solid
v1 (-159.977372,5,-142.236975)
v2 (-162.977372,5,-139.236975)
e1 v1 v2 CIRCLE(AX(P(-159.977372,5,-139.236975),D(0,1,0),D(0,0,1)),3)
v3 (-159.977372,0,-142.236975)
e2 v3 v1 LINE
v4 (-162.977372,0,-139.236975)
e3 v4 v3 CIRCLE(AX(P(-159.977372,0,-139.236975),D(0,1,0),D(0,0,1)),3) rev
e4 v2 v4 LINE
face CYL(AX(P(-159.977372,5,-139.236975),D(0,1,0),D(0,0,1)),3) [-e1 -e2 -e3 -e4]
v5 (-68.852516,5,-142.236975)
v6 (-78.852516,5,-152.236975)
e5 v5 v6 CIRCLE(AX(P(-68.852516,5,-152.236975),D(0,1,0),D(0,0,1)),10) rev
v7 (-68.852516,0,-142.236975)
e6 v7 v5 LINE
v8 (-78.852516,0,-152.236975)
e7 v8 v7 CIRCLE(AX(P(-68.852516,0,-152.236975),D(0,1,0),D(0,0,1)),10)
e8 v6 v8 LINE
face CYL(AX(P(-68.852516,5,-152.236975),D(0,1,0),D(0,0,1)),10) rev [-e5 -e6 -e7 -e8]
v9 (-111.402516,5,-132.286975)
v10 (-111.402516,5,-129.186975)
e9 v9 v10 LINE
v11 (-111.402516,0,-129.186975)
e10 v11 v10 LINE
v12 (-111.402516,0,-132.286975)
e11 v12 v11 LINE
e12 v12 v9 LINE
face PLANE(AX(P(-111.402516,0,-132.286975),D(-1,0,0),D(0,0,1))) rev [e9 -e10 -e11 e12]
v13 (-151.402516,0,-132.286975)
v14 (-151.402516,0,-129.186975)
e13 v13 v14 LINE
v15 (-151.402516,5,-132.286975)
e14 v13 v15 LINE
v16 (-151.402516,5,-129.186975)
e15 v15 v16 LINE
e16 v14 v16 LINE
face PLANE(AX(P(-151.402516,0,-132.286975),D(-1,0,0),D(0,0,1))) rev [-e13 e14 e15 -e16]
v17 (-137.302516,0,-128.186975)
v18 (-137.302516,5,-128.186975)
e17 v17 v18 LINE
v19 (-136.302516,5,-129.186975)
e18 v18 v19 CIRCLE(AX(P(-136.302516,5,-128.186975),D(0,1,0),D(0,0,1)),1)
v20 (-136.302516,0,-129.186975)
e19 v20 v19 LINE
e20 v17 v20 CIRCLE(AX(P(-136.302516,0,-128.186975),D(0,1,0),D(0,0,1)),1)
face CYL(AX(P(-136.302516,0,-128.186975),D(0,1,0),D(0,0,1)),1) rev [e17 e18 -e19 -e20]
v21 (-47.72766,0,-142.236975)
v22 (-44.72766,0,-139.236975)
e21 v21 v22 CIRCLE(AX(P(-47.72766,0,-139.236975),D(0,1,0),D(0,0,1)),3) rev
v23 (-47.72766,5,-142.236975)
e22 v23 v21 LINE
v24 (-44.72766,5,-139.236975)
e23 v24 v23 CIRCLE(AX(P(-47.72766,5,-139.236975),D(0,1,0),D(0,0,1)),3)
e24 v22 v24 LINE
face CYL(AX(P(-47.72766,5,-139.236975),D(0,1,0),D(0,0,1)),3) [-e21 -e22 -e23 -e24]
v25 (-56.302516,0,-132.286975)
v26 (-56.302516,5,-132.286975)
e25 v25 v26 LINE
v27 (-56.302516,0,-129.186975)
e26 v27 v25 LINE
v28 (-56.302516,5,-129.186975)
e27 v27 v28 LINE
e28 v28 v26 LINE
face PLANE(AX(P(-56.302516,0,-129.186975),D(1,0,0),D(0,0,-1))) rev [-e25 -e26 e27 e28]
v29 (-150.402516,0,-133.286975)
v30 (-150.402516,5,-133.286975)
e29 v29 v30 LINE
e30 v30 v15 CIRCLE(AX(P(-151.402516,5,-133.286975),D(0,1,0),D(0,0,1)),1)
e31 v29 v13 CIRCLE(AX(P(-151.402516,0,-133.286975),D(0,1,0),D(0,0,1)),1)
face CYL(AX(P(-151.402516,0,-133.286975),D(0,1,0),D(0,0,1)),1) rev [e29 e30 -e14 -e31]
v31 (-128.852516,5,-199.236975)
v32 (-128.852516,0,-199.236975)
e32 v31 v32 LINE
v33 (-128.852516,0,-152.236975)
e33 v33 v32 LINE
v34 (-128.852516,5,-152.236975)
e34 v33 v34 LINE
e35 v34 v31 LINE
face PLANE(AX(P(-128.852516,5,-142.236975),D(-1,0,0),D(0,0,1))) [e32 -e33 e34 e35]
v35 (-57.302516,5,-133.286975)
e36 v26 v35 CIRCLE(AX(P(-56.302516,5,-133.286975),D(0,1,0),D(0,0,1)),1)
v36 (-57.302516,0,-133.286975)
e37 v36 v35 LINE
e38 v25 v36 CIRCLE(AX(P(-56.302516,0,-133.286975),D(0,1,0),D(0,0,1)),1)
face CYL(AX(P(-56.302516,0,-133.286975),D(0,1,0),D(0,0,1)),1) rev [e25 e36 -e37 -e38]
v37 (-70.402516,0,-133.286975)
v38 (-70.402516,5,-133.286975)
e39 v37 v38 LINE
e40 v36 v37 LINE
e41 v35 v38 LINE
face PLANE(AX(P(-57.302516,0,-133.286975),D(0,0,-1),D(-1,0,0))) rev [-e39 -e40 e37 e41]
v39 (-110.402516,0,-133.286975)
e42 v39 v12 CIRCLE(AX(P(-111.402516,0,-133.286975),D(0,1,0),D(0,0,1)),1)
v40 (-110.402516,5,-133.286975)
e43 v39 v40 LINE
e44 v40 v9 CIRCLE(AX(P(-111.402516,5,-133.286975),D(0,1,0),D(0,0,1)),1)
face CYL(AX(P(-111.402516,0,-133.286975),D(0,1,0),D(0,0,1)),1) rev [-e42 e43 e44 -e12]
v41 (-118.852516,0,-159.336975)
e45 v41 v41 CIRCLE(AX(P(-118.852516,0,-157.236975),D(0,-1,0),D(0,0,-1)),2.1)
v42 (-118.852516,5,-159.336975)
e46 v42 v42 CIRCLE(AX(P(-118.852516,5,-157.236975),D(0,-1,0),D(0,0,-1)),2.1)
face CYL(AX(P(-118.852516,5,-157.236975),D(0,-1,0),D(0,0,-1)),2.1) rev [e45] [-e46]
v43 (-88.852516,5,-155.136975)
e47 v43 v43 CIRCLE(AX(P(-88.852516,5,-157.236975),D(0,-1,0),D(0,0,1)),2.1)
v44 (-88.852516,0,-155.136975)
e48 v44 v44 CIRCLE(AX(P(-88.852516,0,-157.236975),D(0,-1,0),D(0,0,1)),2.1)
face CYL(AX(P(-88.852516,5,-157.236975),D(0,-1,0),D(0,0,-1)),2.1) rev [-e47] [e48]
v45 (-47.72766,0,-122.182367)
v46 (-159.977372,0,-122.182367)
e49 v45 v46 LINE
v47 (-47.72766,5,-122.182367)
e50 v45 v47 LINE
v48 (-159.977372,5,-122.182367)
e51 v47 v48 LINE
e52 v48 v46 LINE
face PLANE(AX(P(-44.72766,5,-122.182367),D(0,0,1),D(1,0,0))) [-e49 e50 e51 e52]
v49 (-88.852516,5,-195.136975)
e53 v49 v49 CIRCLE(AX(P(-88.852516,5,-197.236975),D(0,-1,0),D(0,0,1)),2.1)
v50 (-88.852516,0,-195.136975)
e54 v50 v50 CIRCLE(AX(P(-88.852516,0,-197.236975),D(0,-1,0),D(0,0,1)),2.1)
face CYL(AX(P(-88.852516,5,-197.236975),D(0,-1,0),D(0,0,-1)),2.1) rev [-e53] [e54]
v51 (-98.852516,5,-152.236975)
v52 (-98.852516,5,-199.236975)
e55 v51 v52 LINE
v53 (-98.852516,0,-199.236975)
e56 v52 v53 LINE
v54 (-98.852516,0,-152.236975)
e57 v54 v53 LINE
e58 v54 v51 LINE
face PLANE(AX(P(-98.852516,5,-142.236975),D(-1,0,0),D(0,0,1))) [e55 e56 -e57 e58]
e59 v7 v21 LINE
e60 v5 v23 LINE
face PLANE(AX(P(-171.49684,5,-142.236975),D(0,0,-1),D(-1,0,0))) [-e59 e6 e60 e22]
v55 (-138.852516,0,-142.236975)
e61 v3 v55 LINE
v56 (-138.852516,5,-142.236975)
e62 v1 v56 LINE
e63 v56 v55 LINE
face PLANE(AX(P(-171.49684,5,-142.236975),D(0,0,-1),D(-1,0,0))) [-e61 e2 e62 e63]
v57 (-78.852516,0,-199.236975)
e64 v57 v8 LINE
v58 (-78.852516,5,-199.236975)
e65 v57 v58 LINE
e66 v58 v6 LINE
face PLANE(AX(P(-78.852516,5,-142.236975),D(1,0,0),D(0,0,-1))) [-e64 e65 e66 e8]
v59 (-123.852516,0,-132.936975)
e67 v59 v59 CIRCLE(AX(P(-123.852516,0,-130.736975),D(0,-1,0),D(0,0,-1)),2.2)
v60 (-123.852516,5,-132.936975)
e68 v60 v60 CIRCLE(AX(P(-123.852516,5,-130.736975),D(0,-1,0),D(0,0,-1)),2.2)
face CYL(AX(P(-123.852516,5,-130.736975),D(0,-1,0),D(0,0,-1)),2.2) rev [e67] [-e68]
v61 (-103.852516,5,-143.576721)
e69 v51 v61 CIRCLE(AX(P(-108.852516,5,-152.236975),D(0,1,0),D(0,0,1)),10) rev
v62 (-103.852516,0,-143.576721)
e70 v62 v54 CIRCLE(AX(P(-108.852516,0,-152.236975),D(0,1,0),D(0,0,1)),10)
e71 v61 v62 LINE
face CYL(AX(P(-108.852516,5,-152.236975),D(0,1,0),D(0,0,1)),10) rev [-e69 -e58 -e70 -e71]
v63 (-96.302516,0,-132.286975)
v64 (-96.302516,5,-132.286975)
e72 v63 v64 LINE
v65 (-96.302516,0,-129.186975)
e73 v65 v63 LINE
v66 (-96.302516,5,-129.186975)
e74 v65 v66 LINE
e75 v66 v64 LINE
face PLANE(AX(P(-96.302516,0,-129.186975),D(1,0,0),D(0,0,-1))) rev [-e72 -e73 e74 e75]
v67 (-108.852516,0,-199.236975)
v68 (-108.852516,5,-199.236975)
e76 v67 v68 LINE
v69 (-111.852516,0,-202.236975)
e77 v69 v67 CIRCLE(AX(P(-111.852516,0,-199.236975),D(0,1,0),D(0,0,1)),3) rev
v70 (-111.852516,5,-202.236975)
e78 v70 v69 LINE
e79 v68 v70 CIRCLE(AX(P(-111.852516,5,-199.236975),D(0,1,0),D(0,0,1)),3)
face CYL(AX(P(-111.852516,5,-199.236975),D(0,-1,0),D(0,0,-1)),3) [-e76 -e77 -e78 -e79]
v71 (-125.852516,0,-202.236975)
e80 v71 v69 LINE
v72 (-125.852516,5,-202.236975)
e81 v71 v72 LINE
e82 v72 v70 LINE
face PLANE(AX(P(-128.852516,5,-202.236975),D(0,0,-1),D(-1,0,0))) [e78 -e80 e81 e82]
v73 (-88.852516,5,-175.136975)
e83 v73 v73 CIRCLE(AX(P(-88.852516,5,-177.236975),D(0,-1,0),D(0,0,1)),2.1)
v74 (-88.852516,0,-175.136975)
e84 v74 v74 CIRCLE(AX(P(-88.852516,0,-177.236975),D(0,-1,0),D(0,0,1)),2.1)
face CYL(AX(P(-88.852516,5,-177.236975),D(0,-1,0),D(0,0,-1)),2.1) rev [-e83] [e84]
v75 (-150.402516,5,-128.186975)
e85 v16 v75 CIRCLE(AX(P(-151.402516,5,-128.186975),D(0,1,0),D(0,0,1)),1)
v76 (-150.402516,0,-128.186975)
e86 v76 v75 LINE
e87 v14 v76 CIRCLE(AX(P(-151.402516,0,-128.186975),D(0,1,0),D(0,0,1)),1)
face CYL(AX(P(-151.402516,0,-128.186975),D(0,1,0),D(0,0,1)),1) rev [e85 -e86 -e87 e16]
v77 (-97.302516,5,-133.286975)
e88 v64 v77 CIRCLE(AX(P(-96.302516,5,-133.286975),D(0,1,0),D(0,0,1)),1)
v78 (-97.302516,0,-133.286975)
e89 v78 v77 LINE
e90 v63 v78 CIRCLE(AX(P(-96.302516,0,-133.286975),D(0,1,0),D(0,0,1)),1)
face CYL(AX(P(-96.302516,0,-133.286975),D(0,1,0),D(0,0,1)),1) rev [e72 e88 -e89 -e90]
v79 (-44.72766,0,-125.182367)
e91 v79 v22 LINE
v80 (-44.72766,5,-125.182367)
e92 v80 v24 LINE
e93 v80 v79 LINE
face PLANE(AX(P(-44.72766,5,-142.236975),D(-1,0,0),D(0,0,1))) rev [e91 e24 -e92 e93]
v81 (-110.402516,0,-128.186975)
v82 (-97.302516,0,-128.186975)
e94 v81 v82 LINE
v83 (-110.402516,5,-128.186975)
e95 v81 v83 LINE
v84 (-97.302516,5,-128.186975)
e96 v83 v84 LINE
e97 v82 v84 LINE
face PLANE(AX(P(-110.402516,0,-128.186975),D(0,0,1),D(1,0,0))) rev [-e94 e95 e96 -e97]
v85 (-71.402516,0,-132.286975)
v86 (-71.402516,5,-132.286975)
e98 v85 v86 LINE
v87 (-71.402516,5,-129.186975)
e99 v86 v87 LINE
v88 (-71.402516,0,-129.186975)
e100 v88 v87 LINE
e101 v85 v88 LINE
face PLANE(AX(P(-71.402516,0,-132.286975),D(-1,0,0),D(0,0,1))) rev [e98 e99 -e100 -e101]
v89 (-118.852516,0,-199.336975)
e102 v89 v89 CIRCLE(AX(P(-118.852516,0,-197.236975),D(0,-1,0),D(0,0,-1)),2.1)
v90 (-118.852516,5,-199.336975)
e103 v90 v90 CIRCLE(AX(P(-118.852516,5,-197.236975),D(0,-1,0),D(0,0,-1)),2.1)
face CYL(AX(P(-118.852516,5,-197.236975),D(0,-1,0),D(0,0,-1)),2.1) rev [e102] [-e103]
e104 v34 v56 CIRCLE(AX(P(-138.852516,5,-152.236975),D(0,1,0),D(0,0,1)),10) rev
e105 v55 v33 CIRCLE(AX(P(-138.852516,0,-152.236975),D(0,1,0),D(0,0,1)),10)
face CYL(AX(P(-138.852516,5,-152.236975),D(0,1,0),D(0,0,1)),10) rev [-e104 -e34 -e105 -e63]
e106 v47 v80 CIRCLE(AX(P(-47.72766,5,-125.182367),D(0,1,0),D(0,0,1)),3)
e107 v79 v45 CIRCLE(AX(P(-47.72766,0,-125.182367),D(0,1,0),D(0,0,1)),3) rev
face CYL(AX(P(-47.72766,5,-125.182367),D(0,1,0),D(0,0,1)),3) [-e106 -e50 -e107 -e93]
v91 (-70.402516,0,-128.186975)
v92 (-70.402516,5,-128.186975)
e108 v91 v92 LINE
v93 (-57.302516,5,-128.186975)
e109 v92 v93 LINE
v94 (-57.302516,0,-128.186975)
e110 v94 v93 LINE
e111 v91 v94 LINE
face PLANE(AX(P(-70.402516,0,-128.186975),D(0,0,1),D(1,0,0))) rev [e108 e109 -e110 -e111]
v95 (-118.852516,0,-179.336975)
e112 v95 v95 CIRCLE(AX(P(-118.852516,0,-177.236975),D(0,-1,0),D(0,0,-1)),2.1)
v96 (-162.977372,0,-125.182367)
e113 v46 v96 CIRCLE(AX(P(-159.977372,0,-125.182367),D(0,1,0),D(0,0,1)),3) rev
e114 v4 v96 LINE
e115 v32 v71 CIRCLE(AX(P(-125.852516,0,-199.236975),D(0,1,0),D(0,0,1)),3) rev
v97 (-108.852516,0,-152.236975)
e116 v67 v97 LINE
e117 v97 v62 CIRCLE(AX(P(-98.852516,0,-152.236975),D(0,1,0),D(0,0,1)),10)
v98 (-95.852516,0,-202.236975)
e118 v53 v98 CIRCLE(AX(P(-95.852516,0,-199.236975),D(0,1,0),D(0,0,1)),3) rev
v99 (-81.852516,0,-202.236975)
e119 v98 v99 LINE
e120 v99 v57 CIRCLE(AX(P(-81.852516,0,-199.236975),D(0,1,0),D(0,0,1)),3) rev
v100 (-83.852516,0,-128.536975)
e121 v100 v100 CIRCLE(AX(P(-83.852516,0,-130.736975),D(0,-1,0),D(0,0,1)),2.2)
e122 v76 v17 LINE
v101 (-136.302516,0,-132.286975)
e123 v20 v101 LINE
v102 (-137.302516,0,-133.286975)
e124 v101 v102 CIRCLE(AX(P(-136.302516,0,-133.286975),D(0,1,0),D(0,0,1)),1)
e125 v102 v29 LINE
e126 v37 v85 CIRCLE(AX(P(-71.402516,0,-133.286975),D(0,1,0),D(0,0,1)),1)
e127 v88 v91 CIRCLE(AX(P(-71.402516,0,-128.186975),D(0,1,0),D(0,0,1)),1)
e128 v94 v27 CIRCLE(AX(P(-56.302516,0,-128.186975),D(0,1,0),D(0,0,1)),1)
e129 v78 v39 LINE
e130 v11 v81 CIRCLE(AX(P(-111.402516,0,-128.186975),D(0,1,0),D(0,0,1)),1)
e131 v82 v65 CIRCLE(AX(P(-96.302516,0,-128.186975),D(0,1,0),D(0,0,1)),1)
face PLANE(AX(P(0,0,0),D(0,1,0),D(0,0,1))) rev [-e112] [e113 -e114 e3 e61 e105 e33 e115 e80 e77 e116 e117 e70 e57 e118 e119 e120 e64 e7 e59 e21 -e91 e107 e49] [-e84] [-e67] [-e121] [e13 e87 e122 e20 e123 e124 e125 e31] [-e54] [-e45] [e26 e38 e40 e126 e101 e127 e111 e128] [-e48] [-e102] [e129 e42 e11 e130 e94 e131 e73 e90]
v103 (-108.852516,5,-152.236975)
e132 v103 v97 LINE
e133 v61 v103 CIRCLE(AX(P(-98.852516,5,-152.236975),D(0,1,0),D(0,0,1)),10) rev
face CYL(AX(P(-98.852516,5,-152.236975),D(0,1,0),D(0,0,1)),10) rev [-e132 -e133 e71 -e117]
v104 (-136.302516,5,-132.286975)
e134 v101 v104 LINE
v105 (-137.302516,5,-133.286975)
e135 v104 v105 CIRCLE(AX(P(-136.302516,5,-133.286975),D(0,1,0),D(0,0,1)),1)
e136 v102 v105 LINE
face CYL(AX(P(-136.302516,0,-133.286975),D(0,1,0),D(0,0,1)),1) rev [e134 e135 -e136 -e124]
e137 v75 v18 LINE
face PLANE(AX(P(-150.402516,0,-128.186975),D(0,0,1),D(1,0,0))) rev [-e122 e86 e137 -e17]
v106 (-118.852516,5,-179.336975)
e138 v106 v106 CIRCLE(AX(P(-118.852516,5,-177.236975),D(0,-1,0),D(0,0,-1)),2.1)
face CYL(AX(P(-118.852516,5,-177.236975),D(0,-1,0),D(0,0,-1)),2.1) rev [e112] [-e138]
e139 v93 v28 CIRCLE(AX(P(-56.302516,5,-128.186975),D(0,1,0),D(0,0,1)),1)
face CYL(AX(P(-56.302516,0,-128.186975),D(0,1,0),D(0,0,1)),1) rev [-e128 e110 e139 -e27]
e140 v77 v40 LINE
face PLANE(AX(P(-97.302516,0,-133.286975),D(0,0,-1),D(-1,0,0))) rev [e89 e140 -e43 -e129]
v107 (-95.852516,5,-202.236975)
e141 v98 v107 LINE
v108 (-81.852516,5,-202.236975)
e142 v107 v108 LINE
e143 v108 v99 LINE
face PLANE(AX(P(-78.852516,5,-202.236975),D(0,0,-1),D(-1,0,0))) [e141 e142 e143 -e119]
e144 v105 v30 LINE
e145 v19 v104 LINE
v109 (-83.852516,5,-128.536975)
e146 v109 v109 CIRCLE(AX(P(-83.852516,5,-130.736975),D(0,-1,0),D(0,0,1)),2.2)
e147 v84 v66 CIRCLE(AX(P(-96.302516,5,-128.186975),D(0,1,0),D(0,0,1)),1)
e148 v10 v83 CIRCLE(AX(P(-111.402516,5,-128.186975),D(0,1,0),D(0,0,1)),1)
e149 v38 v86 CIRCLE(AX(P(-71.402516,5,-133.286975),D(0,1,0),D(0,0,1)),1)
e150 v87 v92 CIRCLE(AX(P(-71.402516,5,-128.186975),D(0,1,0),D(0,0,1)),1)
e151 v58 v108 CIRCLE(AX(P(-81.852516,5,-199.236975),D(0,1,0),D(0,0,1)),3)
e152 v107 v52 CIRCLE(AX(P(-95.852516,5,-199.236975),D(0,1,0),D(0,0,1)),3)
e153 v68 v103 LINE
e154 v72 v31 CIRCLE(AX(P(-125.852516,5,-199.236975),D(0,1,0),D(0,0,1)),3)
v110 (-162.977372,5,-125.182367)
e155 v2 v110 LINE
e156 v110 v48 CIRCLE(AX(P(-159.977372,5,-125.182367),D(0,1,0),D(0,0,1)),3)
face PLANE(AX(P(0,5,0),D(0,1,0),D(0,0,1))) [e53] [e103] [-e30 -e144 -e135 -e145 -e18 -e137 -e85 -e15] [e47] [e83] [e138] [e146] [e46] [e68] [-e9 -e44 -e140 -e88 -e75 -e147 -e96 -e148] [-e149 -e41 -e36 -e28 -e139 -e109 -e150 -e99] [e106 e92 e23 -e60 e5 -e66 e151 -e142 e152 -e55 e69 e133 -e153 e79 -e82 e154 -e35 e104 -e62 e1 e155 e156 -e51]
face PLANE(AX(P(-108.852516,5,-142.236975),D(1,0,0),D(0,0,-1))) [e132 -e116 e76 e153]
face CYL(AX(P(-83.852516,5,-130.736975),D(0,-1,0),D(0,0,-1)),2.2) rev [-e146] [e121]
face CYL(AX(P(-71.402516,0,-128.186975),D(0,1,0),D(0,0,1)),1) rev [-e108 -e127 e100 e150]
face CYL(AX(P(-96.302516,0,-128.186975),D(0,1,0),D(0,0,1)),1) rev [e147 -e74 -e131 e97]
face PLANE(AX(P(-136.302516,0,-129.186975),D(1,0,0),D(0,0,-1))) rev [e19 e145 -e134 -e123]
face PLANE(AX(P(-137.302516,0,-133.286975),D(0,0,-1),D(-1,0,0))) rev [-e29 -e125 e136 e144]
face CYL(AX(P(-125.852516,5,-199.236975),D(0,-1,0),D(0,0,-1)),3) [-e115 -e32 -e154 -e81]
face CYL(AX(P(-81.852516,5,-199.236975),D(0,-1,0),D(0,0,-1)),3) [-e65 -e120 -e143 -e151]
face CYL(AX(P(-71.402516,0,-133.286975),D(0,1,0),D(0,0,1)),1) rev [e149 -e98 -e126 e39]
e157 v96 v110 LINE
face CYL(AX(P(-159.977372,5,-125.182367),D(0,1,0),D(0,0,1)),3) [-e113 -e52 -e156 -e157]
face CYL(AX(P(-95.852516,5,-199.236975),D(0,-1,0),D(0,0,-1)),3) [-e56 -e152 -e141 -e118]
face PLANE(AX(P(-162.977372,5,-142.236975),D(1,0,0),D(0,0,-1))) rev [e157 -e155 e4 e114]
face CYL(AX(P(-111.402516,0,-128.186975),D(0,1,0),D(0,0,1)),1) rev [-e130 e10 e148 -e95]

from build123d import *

# Parameters (mm, degrees)
EXTRUDE_4_DEPTH      = 5
EXTRUDE_5_DEPTH      = 5
EXTRUDE_6_DEPTH      = 5
SKETCH_5_R           = 1.7
CUT_EXTRUDE_1_DEPTH  = 5
EXTRUDE_7_DEPTH      = 5
SKETCH_7_R           = 1.7
CUT_EXTRUDE_2_DEPTH  = 5
SKETCH_12_W          = 15
SKETCH_12_H          = 3
EXTRUDE_10_DEPTH     = 5
CUT_EXTRUDE_5_DEPTH  = 5
SKETCH_14_W          = 15
SKETCH_14_H          = 5
EXTRUDE_11_DEPTH     = 5
SKETCH_16_R          = 2.2
CUT_EXTRUDE_7_DEPTH  = 5
CUT_EXTRUDE_8_DEPTH  = 5
SKETCH_19_R          = 2.2
CUT_EXTRUDE_9_DEPTH  = 5
EXTRUDE_12_DEPTH     = 5
FILLET_1_R           = 2
SKETCH_21_W          = 134.232837099
SKETCH_21_H          = 189.007158486
SKETCH_21_W_2        = 166.269417525
SKETCH_21_H_2        = 176.352735834
CUT_EXTRUDE_10_DEPTH = 314.073605795
SKETCH_22_W          = 20
SKETCH_22_H          = 60
SKETCH_22_R          = 2.1
EXTRUDE_13_DEPTH     = 5
FILLET_2_R           = 10
FILLET_3_R           = 3


with BuildPart() as part:
    # 草图2 → 凸台-拉伸4 (new body)
    with BuildSketch(Plane(origin=(0, 0, 0), x_dir=(1, 0, 0), z_dir=(0, 1, 0))):
        Polygon((-163.852515924, 124.182366776), (-43.852515924, 124.182366776), (16.242365952, 59.136369948), (32.045701527, 59.136369948), (51.147484076, 9.582366776), (51.147484076, -23.417633224), (71.147484076, -23.417633224), (71.147484076, 11.582366776), (41.16464964, 70.136369948), (23.597046938, 70.136369948), (-38.39605211, 137.236974827), (-169.308979739, 137.236974827), (-231.302078787, 70.136369948), (-248.869681489, 70.136369948), (-278.852515924, 11.582366776), (-278.852515924, -23.417633224), (-258.852515924, -23.417633224), (-258.852515924, 9.582366776), (-239.750733376, 59.136369948), (-223.947397801, 59.136369948), align=None)
    extrude(amount=EXTRUDE_4_DEPTH)

    # 草图3 → 凸台-拉伸5 (add)
    with BuildSketch(Plane(origin=(0, 5, 0), x_dir=(1, 0, 0), z_dir=(0, 1, 0))):
        Polygon((-258.852515924, -23.417633224), (-252.852515924, -23.417633224), (-252.852515924, 16.806798308), (-236.535564294, 59.136369948), (-239.750733376, 59.136369948), (-258.852515924, 9.582366776), align=None)
        Polygon((51.147484076, -23.417633224), (45.147484076, -23.417633224), (45.147484076, 16.806798308), (28.830532445, 59.136369948), (32.045701527, 59.136369948), (51.147484076, 9.582366776), align=None)
    extrude(amount=-EXTRUDE_5_DEPTH)

    # 草图4 → 凸台-拉伸6 (add)
    with BuildSketch(Plane(origin=(0, 5, 0), x_dir=(1, 0, 0), z_dir=(0, 1, 0))):
        Polygon((-252.852515924, 16.806798308), (-244.852515924, -15.417633224), (-244.852515924, -23.417633224), (-252.852515924, -23.417633224), align=None)
    extrude(amount=-EXTRUDE_6_DEPTH)

    # 草图5 → 切除-拉伸1 (cut)
    with BuildSketch(Plane.XZ):
        with Locations(Location((-273.852515924, 19.417633224, 0), (0, 0, 270))):
            Circle(SKETCH_5_R)
        with Locations(Location((-257.852515924, 19.417633224, 0), (0, 0, 270))):
            Circle(SKETCH_5_R)
    extrude(amount=-CUT_EXTRUDE_1_DEPTH, mode=Mode.SUBTRACT)

    # 草图6 → 凸台-拉伸7 (add)
    with BuildSketch(Plane(origin=(0, 5, 0), x_dir=(1, 0, 0), z_dir=(0, 1, 0))):
        Polygon((45.147484076, -23.417633224), (37.147484076, -23.417633224), (37.147484076, -15.417633224), (45.147484076, 16.806798308), align=None)
    extrude(amount=-EXTRUDE_7_DEPTH)

    # 草图7 → 切除-拉伸2 (cut)
    with BuildSketch(Plane.XZ):
        with Locations(Location((66.147484076, 19.417633224, 0), (0, 0, 270))):
            Circle(SKETCH_7_R)
        with Locations(Location((50.147484076, 19.417633224, 0), (0, 0, 270))):
            Circle(SKETCH_7_R)
    extrude(amount=-CUT_EXTRUDE_2_DEPTH, mode=Mode.SUBTRACT)

    # 草图13 → 切除-拉伸5 (cut)
    with BuildSketch(Plane(origin=(0, 5, 0), x_dir=(1, 0, 0), z_dir=(0, 1, 0))):
        with BuildLine():
            Line((-253.852515924, -23.417633224), (-251.852515924, -23.417633224))
            ThreePointArc((-251.852515924, -23.417633224), (-252.852515924, -22.417633224), (-253.852515924, -23.417633224))
        make_face()
        with BuildLine():
            Line((-268.852515924, -23.417633224), (-270.852515924, -23.417633224))
            ThreePointArc((-270.852515924, -23.417633224), (-269.852515924, -22.417633224), (-268.852515924, -23.417633224))
        make_face()
    cut_extrude_5 = extrude(amount=-CUT_EXTRUDE_5_DEPTH, mode=Mode.SUBTRACT)



with BuildPart() as body_2:
    # 草图12 → 凸台-拉伸10 (new body)
    with BuildSketch(Plane(origin=(0, 5, 0), x_dir=(1, 0, 0), z_dir=(0, 1, 0))):
        with Locations((-261.352515924, -24.917633224)):
            Rectangle(SKETCH_12_W, SKETCH_12_H)
    extrude(amount=-EXTRUDE_10_DEPTH)


with BuildPart() as part_1:
    add(part.part)

    add(body_2.part)  # 凸台-拉伸11 merges body 2
    # 草图14 → 凸台-拉伸11 (add)
    with BuildSketch(Plane.XY.offset(26.417633224)):
        with Locations((-261.352515924, 2.5)):
            Rectangle(SKETCH_14_W, SKETCH_14_H)
    extrude_11 = extrude(amount=-EXTRUDE_11_DEPTH)

    # 镜向4: 切除-拉伸5, 凸台-拉伸11 across plane
    add(cut_extrude_5.mirror(Plane.ZY.offset(103.852515924)), mode=Mode.SUBTRACT)
    add(extrude_11.mirror(Plane.ZY.offset(103.852515924)))

    # 草图16 → 切除-拉伸7 (cut)
    with BuildSketch(Plane(origin=(0, 5, 0), x_dir=(1, 0, 0), z_dir=(0, 1, 0))):
        with Locations(Location((-222.724177384, 69.940679724, 0), (0, 0, 270))):
            Circle(SKETCH_16_R)
        with Locations(Location((-182.008197488, 114.011179848, 0), (0, 0, 270))):
            Circle(SKETCH_16_R)
        with Locations(Location((-209.152184085, 84.630846432, 0), (0, 0, 270))):
            Circle(SKETCH_16_R)
        with Locations(Location((1.447152236, 84.630846432, 0), (0, 0, 90))):
            Circle(SKETCH_16_R)
        with Locations(Location((-25.696834361, 114.011179848, 0), (0, 0, 90))):
            Circle(SKETCH_16_R)
        with Locations(Location((15.019145535, 69.940679724, 0), (0, 0, 90))):
            Circle(SKETCH_16_R)
        with Locations(Location((-262.852515924, 20.136369948, 0), (0, 0, 270))):
            Circle(SKETCH_16_R)
        with Locations(Location((55.147484076, 20.136369948, 0), (0, 0, 90))):
            Circle(SKETCH_16_R)
    extrude(amount=-CUT_EXTRUDE_7_DEPTH, mode=Mode.SUBTRACT)

    # 草图18 → 切除-拉伸8 (cut)
    with BuildSketch(Plane(origin=(0, 5, 0), x_dir=(1, 0, 0), z_dir=(0, 1, 0))):
        with BuildLine():
            Line((-151.402515924, 132.286974827), (-151.402515924, 129.186974827))
            ThreePointArc((-151.402515924, 129.186974827), (-152.109622706, 127.479868046), (-150.402515924, 128.186974827))
            Line((-150.402515924, 128.186974827), (-137.302515924, 128.186974827))
            ThreePointArc((-137.302515924, 128.186974827), (-135.595409143, 127.479868046), (-136.302515924, 129.186974827))
            Line((-136.302515924, 129.186974827), (-136.302515924, 132.286974827))
            ThreePointArc((-136.302515924, 132.286974827), (-135.595409143, 133.994081608), (-137.302515924, 133.286974827))
            Line((-137.302515924, 133.286974827), (-150.402515924, 133.286974827))
            ThreePointArc((-150.402515924, 133.286974827), (-152.109622706, 133.994081608), (-151.402515924, 132.286974827))
        make_face()
        with BuildLine():
            Line((-97.302515924, 133.286974827), (-110.402515924, 133.286974827))
            ThreePointArc((-110.402515924, 133.286974827), (-112.109622706, 133.994081608), (-111.402515924, 132.286974827))
            Line((-111.402515924, 132.286974827), (-111.402515924, 129.186974827))
            ThreePointArc((-111.402515924, 129.186974827), (-112.109622706, 127.479868046), (-110.402515924, 128.186974827))
            Line((-110.402515924, 128.186974827), (-97.302515924, 128.186974827))
            ThreePointArc((-97.302515924, 128.186974827), (-95.595409143, 127.479868046), (-96.302515924, 129.186974827))
            Line((-96.302515924, 129.186974827), (-96.302515924, 132.286974827))
            ThreePointArc((-96.302515924, 132.286974827), (-95.595409143, 133.994081608), (-97.302515924, 133.286974827))
        make_face()
        with BuildLine():
            Line((-57.302515924, 133.286974827), (-70.402515924, 133.286974827))
            ThreePointArc((-70.402515924, 133.286974827), (-72.109622706, 133.994081608), (-71.402515924, 132.286974827))
            Line((-71.402515924, 132.286974827), (-71.402515924, 129.186974827))
            ThreePointArc((-71.402515924, 129.186974827), (-72.109622706, 127.479868046), (-70.402515924, 128.186974827))
            Line((-70.402515924, 128.186974827), (-57.302515924, 128.186974827))
            ThreePointArc((-57.302515924, 128.186974827), (-55.595409143, 127.479868046), (-56.302515924, 129.186974827))
            Line((-56.302515924, 129.186974827), (-56.302515924, 132.286974827))
            ThreePointArc((-56.302515924, 132.286974827), (-55.595409143, 133.994081608), (-57.302515924, 133.286974827))
        make_face()
    extrude(amount=-CUT_EXTRUDE_8_DEPTH, mode=Mode.SUBTRACT)

    # 草图19 → 切除-拉伸9 (cut)
    with BuildSketch(Plane.XZ):
        with Locations(Location((-123.852515924, -130.736974827, 0), (0, 0, 270))):
            Circle(SKETCH_19_R)
        with Locations(Location((-83.852515924, -130.736974827, 0), (0, 0, 90))):
            Circle(SKETCH_19_R)
    extrude(amount=-CUT_EXTRUDE_9_DEPTH, mode=Mode.SUBTRACT)

    # 草图20 → 凸台-拉伸12 (add)
    with BuildSketch(Plane.XZ):
        Polygon((29.601480556, -57.136369948), (15.367221806, -57.136369948), (-44.727660071, -122.182366776), (-162.977371778, -122.182366776), (-223.072253655, -57.136369948), (-237.306512405, -57.136369948), (-236.535564294, -59.136369948), (-223.947397801, -59.136369948), (-163.852515924, -124.182366776), (-43.852515924, -124.182366776), (16.242365952, -59.136369948), (28.830532445, -59.136369948), align=None)
        Polygon((-248.869681489, -70.136369948), (-246.309409534, -75.136369948), (-233.489939153, -75.136369948), (-171.496840105, -142.236974827), (-36.208191744, -142.236974827), (25.784907304, -75.136369948), (38.604377685, -75.136369948), (41.16464964, -70.136369948), (23.597046938, -70.136369948), (-38.39605211, -137.236974827), (-169.308979739, -137.236974827), (-231.302078787, -70.136369948), align=None)
    extrude(amount=-EXTRUDE_12_DEPTH)

    # 圆角1
    fillet_1_edges = [part_1.edges().sort_by_distance(p)[0] for p in [
        (-278.852515924, 2.5, 23.417633224),
        (71.147484076, 2.5, 23.417633224),
        (-244.852515924, 2.5, 23.417633224),
        (-244.852515924, 2.5, 15.417633224),
        (37.147484076, 2.5, 23.417633224),
        (37.147484076, 2.5, 15.417633224),
    ]]
    fillet(fillet_1_edges, radius=FILLET_1_R)

    # 草图21 → 切除-拉伸10 (cut, through all)
    with BuildSketch(Plane.XZ):
        with Locations((-230.093790328, -47.733395584)):
            Rectangle(SKETCH_21_W, SKETCH_21_H)
        with Locations((38.407048692, -54.06060691)):
            Rectangle(SKETCH_21_W_2, SKETCH_21_H_2)
    extrude(amount=-CUT_EXTRUDE_10_DEPTH, mode=Mode.SUBTRACT)

    # 草图22 → 凸台-拉伸13 (add, through all)
    # profile 1 of 2: a face of its own
    with BuildSketch(Plane.XZ):
        with Locations((-118.852515924, -172.236974827)):
            Rectangle(SKETCH_22_W, SKETCH_22_H)
        with Locations(Location((-118.852515924, -197.236974827, 0), (0, 0, 270))):
            Circle(SKETCH_22_R, mode=Mode.SUBTRACT)
        with Locations(Location((-118.852515924, -177.236974827, 0), (0, 0, 270))):
            Circle(SKETCH_22_R, mode=Mode.SUBTRACT)
        with Locations(Location((-118.852515924, -157.236974827, 0), (0, 0, 270))):
            Circle(SKETCH_22_R, mode=Mode.SUBTRACT)
    # profile 2 of 2: a face of its own
    with BuildSketch(Plane.XZ):
        with Locations((-88.852515924, -172.236974827)):
            Rectangle(SKETCH_22_W, SKETCH_22_H)
        with Locations(Location((-88.852515924, -197.236974827, 0), (0, 0, 90))):
            Circle(SKETCH_22_R, mode=Mode.SUBTRACT)
        with Locations(Location((-88.852515924, -177.236974827, 0), (0, 0, 90))):
            Circle(SKETCH_22_R, mode=Mode.SUBTRACT)
        with Locations(Location((-88.852515924, -157.236974827, 0), (0, 0, 90))):
            Circle(SKETCH_22_R, mode=Mode.SUBTRACT)
    extrude(amount=-EXTRUDE_13_DEPTH)

    # 圆角2
    # the kernel refuses this fillet: 10 mm, written as the material it adds along each edge
    with BuildSketch(Plane(origin=(-128.852515924, 0, -142.236974827), x_dir=(-1, 0, 0), z_dir=(0, 1, 0)), Plane(origin=(-98.852515924, 0, -142.236974827), x_dir=(-1, 0, 0), z_dir=(0, 1, 0))) as fillet_2_piece_1:
        with BuildLine():
            CenterArc((FILLET_2_R, -FILLET_2_R), FILLET_2_R, 90, 90)
            Line((0, -FILLET_2_R), (0, 0))
            Line((0, 0), (FILLET_2_R, 0))
        make_face()
    extrude(amount=5)
    with BuildSketch(Plane(origin=(-108.852515924, 0, -142.236974827), x_dir=(1, 0, 0), z_dir=(0, 1, 0)), Plane(origin=(-78.852515924, 0, -142.236974827), x_dir=(1, 0, 0), z_dir=(0, 1, 0))) as fillet_2_piece_2:
        with BuildLine():
            CenterArc((FILLET_2_R, FILLET_2_R), FILLET_2_R, 180, 90)
            Line((0, FILLET_2_R), (0, 0))
            Line((0, 0), (FILLET_2_R, 0))
        make_face()
    extrude(amount=5)

    # 圆角3
    fillet_3_edges = [part_1.edges().sort_by_distance(p)[0] for p in [
        (-162.977371778, 2.5, -122.182366776),
        (-44.727660071, 2.5, -122.182366776),
        (-162.977371778, 2.5, -142.236974827),
        (-44.727660071, 2.5, -142.236974827),
        (-128.852515924, 2.5, -202.236974827),
        (-108.852515924, 2.5, -202.236974827),
        (-78.852515924, 2.5, -202.236974827),
        (-98.852515924, 2.5, -202.236974827),
    ]]
    fillet(fillet_3_edges, radius=FILLET_3_R)


solid = part_1.part
